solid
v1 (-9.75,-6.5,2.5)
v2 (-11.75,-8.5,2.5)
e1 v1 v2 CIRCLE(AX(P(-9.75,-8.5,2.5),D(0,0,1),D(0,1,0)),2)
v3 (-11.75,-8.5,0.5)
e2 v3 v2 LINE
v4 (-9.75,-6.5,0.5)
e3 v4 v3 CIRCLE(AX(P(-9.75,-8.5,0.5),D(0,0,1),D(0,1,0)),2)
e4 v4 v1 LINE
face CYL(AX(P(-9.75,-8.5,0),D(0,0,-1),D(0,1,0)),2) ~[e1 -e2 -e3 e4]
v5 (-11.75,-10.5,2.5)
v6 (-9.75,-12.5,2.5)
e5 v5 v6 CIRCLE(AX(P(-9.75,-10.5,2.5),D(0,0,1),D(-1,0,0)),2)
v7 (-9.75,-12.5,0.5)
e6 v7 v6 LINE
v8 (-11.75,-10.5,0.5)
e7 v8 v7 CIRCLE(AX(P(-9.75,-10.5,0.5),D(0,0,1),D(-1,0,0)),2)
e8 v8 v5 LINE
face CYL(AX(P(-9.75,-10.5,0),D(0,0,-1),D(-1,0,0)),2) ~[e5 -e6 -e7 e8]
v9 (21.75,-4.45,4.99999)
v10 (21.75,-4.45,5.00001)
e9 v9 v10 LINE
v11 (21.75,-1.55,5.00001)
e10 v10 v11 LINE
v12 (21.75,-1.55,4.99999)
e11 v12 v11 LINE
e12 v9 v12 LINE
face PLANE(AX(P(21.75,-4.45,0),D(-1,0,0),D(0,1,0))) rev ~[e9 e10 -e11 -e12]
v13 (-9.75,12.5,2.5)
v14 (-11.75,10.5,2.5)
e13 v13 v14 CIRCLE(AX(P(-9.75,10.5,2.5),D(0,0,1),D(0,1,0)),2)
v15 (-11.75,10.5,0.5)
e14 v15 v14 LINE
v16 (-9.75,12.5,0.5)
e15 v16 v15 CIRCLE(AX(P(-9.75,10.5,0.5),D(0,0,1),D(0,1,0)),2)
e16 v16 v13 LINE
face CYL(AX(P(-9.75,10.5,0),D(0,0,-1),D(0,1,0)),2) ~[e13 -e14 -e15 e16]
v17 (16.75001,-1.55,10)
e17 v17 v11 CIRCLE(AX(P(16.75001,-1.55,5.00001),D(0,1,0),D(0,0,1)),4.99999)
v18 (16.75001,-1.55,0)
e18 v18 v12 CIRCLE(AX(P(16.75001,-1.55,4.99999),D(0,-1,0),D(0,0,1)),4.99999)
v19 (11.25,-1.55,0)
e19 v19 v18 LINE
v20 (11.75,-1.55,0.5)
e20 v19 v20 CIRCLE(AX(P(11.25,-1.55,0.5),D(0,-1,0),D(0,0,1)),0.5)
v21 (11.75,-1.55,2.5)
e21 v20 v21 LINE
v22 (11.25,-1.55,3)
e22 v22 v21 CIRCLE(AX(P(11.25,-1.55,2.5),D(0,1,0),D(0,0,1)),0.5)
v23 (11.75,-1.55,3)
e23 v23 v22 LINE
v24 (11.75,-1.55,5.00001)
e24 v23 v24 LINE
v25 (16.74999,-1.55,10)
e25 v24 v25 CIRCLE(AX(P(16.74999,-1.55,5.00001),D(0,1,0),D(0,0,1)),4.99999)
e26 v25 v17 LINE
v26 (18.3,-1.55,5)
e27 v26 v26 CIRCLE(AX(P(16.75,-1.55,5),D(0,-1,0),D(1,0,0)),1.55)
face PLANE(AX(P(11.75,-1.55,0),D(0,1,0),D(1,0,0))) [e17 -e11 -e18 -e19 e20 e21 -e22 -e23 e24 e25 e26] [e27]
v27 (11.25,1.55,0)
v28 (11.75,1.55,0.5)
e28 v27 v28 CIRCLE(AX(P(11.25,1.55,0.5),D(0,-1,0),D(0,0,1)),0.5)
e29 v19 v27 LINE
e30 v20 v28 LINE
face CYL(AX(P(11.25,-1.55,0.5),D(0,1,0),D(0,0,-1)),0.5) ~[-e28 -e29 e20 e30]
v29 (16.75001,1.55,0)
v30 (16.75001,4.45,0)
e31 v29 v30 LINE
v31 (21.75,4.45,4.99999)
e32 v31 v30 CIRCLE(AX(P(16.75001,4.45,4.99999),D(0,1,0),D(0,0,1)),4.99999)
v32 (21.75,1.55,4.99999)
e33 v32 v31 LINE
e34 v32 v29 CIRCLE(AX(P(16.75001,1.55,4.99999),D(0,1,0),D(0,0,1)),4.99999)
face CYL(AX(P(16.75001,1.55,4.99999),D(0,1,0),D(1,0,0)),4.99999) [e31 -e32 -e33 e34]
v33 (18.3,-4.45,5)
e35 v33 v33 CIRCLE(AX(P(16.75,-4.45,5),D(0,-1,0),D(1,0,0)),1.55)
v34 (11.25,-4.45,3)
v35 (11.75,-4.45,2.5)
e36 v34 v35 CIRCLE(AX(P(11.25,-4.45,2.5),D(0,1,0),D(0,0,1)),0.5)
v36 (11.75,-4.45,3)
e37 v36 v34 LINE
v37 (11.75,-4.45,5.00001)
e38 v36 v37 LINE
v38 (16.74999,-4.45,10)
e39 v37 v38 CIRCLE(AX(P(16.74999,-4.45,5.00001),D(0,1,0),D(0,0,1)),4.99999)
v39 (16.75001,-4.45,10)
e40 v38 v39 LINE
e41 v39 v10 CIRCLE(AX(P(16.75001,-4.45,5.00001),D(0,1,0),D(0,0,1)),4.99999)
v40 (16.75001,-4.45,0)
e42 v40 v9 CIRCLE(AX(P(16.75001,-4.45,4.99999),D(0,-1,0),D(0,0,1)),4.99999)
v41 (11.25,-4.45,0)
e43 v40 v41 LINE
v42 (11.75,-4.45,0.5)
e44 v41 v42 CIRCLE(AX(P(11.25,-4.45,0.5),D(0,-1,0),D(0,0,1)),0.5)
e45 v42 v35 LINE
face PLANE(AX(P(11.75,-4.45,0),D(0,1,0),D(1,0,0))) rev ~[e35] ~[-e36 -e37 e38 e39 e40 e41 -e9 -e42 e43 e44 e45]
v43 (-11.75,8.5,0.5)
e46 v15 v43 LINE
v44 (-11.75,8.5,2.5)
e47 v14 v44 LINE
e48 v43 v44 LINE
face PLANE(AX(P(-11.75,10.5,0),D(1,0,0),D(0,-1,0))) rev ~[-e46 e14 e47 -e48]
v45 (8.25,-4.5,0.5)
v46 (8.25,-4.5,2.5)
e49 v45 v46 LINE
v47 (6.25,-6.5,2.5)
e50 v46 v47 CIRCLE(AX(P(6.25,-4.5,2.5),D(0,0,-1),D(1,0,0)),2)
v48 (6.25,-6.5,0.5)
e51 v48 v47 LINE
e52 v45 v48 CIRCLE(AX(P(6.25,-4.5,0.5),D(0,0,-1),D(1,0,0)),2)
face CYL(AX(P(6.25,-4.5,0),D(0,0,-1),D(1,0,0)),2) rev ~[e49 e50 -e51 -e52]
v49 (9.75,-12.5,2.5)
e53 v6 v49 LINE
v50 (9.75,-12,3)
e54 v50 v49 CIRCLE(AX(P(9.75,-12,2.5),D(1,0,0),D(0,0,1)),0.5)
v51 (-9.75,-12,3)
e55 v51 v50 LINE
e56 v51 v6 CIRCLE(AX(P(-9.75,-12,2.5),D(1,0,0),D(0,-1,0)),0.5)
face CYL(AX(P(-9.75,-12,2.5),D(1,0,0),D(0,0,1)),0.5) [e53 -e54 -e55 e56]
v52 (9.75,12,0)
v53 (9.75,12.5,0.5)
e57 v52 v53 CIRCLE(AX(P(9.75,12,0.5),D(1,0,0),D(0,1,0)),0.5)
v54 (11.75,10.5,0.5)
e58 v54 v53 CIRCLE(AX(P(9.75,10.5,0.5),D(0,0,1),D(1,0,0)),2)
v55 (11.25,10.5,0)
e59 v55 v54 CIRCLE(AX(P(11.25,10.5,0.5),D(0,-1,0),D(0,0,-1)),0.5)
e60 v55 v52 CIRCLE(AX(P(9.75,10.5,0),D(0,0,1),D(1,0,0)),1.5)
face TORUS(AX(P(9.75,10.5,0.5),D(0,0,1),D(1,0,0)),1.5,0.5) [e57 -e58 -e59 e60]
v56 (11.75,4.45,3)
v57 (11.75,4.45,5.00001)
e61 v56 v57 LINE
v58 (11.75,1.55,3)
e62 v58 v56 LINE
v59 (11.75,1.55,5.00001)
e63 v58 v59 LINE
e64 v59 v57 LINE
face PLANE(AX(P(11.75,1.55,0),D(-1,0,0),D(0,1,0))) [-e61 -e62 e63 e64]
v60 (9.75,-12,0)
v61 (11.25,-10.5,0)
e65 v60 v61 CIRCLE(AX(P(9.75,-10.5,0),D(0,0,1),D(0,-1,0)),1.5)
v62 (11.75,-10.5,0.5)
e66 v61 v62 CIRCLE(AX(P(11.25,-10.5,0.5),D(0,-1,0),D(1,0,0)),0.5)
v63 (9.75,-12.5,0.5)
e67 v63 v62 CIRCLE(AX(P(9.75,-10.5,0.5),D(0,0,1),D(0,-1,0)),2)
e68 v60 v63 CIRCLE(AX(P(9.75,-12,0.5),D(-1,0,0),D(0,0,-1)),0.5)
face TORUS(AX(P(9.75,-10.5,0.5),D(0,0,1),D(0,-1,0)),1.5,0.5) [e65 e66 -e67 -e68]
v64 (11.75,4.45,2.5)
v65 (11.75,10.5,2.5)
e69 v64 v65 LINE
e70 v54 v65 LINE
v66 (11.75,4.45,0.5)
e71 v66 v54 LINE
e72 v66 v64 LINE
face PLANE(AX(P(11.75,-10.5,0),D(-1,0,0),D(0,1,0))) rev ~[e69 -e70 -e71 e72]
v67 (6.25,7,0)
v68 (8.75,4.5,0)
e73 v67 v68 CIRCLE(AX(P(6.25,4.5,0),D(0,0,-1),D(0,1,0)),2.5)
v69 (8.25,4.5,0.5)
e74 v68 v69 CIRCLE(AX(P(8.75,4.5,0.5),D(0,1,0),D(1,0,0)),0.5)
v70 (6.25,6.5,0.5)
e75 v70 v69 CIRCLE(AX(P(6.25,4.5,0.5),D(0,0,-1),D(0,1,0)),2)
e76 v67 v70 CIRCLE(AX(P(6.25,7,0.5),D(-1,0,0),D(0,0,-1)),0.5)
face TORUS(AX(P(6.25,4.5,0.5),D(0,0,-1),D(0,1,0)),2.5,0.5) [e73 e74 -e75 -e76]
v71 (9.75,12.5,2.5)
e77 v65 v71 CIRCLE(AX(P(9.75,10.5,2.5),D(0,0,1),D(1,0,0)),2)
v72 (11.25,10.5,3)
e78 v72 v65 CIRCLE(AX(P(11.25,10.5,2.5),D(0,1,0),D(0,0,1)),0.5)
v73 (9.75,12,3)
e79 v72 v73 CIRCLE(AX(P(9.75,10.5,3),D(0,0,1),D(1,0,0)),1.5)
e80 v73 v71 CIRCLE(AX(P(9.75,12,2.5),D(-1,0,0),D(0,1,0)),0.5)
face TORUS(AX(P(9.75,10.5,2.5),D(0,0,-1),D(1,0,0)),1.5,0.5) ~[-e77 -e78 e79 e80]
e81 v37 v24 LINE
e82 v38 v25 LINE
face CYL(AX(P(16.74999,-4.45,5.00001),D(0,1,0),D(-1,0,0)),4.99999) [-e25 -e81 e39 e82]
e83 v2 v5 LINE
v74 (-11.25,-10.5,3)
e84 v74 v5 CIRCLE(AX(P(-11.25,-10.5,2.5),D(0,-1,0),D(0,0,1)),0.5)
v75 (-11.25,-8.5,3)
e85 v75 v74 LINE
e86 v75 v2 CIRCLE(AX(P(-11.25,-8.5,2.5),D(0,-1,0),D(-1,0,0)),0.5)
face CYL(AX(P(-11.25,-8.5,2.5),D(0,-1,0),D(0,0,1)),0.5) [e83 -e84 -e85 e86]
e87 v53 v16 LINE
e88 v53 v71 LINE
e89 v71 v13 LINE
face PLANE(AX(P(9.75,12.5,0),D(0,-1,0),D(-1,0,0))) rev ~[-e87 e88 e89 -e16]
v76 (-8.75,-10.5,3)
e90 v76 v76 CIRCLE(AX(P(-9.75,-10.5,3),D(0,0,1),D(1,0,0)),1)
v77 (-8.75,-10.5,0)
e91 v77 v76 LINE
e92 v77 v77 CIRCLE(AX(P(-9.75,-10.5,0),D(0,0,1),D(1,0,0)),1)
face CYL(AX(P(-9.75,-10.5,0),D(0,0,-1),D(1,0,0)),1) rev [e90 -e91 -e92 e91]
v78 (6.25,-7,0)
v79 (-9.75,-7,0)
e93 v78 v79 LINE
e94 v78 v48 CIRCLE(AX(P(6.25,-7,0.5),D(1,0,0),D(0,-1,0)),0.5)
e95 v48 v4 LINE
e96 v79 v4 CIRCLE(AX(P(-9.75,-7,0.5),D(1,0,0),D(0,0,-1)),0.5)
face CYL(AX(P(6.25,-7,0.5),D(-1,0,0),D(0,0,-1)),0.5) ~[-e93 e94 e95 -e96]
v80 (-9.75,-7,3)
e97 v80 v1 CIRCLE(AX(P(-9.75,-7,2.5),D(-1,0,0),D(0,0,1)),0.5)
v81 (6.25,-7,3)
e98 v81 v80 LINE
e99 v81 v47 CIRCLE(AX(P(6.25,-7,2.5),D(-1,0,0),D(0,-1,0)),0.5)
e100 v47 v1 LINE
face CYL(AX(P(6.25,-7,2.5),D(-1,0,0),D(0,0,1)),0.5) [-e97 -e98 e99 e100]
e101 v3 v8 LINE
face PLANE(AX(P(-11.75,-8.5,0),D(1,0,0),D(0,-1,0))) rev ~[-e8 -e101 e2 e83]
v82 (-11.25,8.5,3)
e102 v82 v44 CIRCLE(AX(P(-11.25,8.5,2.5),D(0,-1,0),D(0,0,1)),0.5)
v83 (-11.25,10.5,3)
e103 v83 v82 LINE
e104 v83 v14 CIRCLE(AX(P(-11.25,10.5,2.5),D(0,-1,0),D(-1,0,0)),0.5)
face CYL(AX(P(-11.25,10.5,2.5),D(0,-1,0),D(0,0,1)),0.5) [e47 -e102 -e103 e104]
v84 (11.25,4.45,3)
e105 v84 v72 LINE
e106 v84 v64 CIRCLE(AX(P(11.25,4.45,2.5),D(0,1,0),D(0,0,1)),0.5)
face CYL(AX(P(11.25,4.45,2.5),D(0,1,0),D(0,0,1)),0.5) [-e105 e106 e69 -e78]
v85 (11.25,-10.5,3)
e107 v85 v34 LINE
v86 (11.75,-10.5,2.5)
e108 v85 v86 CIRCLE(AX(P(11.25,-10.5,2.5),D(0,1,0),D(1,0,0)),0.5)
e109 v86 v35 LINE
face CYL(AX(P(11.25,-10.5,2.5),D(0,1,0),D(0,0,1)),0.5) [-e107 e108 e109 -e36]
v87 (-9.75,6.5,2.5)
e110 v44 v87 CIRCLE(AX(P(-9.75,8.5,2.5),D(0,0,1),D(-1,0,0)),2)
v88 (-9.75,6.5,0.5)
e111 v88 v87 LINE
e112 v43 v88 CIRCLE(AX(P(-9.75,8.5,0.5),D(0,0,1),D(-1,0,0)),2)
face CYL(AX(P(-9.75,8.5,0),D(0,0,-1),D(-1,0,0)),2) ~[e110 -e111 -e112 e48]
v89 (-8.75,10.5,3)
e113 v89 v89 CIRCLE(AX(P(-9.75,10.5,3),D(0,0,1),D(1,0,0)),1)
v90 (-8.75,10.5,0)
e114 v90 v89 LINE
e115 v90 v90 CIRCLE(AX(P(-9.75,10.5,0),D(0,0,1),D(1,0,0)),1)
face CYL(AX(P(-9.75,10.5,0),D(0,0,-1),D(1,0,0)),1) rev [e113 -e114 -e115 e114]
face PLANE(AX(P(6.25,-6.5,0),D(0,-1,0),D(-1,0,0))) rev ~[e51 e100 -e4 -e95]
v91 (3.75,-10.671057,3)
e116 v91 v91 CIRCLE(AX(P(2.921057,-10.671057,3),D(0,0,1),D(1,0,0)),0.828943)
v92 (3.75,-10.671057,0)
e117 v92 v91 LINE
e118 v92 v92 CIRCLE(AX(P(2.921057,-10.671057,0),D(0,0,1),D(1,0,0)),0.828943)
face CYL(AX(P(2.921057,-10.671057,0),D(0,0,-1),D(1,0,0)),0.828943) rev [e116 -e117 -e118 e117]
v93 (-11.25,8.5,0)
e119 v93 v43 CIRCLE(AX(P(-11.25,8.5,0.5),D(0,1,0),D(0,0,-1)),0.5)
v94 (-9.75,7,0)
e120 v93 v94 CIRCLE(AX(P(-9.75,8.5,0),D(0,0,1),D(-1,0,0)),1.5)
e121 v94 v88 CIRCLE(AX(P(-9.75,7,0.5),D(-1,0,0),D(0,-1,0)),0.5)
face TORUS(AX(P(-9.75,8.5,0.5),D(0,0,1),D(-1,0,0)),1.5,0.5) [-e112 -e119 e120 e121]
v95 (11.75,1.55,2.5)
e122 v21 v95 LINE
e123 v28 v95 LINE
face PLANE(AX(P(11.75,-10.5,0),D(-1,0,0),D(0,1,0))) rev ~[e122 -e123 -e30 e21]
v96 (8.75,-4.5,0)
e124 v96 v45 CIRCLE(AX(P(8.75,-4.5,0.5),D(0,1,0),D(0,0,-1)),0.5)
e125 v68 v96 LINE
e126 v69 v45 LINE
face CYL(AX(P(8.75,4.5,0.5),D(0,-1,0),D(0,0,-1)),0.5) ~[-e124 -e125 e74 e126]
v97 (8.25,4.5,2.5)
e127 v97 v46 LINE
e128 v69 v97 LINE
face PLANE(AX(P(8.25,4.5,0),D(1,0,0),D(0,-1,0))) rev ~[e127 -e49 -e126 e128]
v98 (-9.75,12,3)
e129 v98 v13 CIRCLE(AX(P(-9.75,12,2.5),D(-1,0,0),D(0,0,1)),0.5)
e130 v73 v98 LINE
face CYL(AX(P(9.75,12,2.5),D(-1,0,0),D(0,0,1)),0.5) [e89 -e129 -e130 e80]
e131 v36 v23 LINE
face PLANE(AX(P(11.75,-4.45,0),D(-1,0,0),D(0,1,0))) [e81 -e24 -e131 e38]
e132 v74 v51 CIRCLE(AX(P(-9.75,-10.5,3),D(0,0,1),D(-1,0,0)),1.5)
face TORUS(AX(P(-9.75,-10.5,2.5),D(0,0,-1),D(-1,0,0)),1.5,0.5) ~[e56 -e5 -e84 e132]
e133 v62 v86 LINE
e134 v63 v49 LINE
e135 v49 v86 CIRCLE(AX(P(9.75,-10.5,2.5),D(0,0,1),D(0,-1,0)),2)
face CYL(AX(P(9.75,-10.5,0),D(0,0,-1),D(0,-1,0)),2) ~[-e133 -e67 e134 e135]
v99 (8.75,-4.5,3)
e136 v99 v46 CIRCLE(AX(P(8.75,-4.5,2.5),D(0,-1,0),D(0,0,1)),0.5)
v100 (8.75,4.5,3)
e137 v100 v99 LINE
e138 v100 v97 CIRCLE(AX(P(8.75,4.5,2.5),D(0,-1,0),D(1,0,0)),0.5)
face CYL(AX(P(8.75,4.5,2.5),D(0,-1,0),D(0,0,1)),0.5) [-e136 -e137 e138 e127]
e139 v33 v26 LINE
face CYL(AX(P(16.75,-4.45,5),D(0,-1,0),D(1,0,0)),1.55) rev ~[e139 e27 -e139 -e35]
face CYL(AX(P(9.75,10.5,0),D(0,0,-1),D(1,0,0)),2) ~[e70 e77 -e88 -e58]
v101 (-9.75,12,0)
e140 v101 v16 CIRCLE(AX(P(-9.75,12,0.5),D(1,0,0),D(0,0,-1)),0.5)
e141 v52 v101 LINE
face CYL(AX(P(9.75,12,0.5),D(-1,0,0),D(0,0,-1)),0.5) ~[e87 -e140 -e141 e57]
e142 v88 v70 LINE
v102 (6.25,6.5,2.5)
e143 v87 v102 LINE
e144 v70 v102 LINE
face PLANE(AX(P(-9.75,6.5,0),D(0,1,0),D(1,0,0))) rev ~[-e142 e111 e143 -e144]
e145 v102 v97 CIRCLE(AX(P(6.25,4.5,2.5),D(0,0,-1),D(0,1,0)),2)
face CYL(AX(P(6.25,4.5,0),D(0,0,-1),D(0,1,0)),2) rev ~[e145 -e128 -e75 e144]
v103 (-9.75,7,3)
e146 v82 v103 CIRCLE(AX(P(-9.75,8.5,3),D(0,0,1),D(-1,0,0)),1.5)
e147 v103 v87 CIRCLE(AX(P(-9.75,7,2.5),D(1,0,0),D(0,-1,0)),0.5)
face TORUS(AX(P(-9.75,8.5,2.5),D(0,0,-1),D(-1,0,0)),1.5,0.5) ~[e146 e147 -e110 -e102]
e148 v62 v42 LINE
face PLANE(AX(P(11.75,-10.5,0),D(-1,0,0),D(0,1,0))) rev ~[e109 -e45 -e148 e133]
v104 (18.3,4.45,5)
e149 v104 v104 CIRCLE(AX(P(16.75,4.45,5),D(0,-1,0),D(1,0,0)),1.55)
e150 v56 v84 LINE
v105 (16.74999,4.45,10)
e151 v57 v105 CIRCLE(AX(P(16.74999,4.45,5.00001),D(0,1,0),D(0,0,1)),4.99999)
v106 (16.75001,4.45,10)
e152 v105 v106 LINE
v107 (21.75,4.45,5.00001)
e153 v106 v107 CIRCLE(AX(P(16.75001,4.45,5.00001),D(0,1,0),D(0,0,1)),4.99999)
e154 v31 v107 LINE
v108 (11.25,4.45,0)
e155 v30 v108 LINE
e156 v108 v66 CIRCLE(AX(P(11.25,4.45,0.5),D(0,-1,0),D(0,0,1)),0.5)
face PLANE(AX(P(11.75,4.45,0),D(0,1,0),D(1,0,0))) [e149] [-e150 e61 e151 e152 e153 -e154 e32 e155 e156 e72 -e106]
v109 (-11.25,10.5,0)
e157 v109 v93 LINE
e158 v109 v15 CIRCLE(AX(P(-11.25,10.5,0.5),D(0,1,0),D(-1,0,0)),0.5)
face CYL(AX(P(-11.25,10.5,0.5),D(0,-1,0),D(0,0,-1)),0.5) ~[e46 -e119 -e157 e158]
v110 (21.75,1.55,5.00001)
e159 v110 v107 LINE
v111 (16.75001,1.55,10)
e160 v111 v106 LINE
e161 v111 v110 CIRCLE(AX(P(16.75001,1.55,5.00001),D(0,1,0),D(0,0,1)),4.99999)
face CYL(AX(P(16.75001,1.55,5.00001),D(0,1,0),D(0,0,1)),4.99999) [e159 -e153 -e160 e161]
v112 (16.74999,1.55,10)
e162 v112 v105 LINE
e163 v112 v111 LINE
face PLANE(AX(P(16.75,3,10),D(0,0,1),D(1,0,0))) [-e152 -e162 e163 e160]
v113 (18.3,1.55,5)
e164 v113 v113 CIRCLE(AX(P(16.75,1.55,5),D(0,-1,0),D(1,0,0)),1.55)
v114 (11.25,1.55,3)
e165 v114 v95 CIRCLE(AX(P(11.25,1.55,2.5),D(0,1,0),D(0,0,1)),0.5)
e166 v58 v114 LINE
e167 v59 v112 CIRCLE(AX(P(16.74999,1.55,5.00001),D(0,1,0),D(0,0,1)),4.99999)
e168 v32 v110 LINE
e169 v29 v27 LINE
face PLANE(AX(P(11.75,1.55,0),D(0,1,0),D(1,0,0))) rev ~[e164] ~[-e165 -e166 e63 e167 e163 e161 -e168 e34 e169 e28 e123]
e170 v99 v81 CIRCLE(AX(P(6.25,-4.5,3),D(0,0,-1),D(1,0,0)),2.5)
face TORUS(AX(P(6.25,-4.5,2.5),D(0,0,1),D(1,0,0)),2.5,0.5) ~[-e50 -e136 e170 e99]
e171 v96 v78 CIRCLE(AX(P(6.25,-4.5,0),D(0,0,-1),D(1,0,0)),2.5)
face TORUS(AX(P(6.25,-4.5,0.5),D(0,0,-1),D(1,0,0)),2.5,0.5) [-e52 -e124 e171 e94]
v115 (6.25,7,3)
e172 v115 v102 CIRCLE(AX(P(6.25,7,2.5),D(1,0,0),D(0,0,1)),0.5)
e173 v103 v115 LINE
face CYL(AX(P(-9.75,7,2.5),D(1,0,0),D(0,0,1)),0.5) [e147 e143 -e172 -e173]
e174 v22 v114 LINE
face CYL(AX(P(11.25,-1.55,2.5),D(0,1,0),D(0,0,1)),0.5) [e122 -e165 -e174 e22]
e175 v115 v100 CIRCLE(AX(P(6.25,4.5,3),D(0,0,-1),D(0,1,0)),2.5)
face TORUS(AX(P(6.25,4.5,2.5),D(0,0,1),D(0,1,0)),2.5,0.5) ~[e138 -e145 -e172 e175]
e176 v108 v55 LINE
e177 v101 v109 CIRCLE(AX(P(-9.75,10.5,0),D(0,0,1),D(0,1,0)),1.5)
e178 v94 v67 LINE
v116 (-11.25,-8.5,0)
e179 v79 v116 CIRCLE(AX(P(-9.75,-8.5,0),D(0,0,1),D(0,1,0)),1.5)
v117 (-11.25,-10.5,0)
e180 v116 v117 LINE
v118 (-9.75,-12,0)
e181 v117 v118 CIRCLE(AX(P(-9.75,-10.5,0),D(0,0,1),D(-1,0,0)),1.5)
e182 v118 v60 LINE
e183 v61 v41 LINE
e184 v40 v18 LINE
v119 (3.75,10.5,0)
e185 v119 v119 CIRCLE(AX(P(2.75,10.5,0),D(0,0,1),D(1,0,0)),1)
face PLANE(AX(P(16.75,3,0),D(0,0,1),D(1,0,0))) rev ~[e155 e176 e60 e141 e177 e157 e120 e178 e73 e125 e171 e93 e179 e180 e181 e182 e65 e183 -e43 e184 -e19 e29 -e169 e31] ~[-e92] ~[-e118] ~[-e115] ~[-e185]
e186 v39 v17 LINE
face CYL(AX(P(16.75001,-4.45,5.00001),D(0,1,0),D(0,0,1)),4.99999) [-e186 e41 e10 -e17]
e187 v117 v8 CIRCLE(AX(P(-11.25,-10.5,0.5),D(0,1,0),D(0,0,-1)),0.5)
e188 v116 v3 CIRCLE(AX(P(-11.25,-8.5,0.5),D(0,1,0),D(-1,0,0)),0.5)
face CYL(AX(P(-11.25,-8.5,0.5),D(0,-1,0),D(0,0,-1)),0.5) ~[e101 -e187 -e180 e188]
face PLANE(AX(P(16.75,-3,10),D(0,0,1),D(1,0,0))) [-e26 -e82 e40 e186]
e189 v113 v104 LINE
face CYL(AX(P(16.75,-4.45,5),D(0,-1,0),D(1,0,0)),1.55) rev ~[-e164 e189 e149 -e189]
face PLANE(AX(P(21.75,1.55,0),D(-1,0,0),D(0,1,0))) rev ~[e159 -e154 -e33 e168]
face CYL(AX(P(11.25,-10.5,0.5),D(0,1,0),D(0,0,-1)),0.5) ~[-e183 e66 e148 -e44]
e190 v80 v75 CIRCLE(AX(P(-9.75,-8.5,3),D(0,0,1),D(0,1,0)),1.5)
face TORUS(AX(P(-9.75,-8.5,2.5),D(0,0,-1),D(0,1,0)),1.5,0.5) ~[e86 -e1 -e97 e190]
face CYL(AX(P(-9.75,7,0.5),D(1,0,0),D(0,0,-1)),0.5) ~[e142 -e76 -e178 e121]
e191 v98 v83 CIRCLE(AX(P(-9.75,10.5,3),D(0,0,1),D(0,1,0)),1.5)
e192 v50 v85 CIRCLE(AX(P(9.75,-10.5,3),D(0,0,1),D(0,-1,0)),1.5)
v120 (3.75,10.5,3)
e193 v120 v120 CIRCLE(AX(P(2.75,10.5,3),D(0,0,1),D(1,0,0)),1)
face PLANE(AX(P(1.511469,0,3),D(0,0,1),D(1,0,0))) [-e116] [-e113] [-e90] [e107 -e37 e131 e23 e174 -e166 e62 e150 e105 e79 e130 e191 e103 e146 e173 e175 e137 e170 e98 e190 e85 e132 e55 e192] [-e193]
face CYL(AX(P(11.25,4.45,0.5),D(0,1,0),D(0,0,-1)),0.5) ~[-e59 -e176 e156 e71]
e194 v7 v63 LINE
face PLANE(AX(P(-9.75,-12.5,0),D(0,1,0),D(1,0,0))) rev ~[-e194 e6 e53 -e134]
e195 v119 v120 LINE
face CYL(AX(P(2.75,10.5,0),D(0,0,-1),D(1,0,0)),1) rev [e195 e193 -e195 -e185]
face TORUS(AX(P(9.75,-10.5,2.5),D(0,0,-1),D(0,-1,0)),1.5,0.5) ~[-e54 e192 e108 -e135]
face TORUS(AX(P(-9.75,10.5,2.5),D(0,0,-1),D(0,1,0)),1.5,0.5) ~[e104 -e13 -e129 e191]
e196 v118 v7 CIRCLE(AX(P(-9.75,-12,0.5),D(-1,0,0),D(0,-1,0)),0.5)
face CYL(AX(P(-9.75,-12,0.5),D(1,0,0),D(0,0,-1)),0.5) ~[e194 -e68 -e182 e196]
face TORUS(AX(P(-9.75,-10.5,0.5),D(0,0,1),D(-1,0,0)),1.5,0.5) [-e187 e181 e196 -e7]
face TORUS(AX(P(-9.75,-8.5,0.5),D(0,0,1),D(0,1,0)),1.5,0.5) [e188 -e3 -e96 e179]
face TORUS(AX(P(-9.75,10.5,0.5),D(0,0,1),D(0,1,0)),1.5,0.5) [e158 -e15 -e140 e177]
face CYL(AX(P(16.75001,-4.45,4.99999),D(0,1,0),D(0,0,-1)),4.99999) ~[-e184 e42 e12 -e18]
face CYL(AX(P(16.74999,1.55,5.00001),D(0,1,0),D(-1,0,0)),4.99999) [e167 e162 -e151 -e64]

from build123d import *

# Parameters (mm, degrees)
F0_R     = 1
F0_R_2   = 0.8289430236
F1_DEPTH = 3
F0_W     = 10
F0_H     = 2.9
F2_DEPTH = 10
F3_R     = 4.99999
F5_R     = 0.5
F4_R     = 1.55
F6_DEPTH = 8.9


# Not quite as in the source:
# - a fillet or chamfer is up to 0.001 mm smaller than in the source, because OpenCascade refuses the exact size


with BuildPart() as f1:
    # F0 (on Top) → F1 (new body)
    with BuildSketch(Plane.XY):
        with BuildLine():
            ThreePointArc((11.75, 10.5), (11.1642135624, 11.9142135624), (9.75, 12.5))
            Line((9.75, 12.5), (-9.75, 12.5))
            ThreePointArc((-9.75, 12.5), (-11.1642135624, 11.9142135624), (-11.75, 10.5))
            Line((-11.75, 10.5), (-11.75, 8.5))
            ThreePointArc((-11.75, 8.5), (-11.1642135624, 7.0857864376), (-9.75, 6.5))
            Line((-9.75, 6.5), (6.25, 6.5))
            ThreePointArc((6.25, 6.5), (7.6642135624, 5.9142135624), (8.25, 4.5))
            Line((8.25, 4.5), (8.25, -4.5))
            ThreePointArc((8.25, -4.5), (7.6642135624, -5.9142135624), (6.25, -6.5))
            Line((6.25, -6.5), (-9.75, -6.5))
            ThreePointArc((-9.75, -6.5), (-11.1642135624, -7.0857864376), (-11.75, -8.5))
            Line((-11.75, -8.5), (-11.75, -10.5))
            ThreePointArc((-11.75, -10.5), (-11.1642135624, -11.9142135624), (-9.75, -12.5))
            Line((-9.75, -12.5), (9.75, -12.5))
            ThreePointArc((9.75, -12.5), (11.1642135624, -11.9142135624), (11.75, -10.5))
            Line((11.75, -10.5), (11.75, -4.45))
            Line((11.75, -4.45), (11.75, -1.55))
            Line((11.75, -1.55), (11.75, 1.55))
            Line((11.75, 1.55), (11.75, 4.45))
            Line((11.75, 4.45), (11.75, 10.5))
        make_face()
        with Locations((-9.75, -10.5)):
            Circle(F0_R, mode=Mode.SUBTRACT)
        with Locations((2.9210569764, -10.6710569764)):
            Circle(F0_R_2, mode=Mode.SUBTRACT)
        with Locations((-9.75, 10.5)):
            Circle(F0_R, mode=Mode.SUBTRACT)
        with Locations((2.75, 10.5)):
            Circle(F0_R, mode=Mode.SUBTRACT)
    extrude(amount=F1_DEPTH)

    # F0 (on Top) → F2 (join)
    with BuildSketch(Plane.XY):
        with Locations((16.75, 3)):
            Rectangle(F0_W, F0_H)
        with Locations((16.75, -3)):
            Rectangle(F0_W, F0_H)
    extrude(amount=F2_DEPTH)

    # F3 (radius 5 in the source; OpenCascade refuses exactly that, so slightly less here)
    f3_edges = [f1.edges().sort_by_distance(p)[0] for p in [
        (11.75, -3, 10),
        (11.75, 3, 10),
        (21.75, 3, 10),
        (21.75, -3, 10),
        (21.75, 3, 0),
        (21.75, -3, 0),
    ]]
    fillet(f3_edges, radius=F3_R)

    # F5
    f5_edges = [f1.edges().sort_by_distance(p)[0] for p in [
        (-1.75, 6.5, 3),
        (11.75, 7.475, 3),
        (11.75, 0, 3),
        (11.75, -7.475, 3),
        (0, -12.5, 0),
        (11.75, 0, 0),
    ]]
    fillet(f5_edges, radius=F5_R)

    # F4 (on face) → F6 (cut)
    with BuildSketch(Plane.XZ.offset(4.45)):
        with Locations((16.75, 5)):
            Circle(F4_R)
    extrude(amount=-F6_DEPTH, mode=Mode.SUBTRACT)


solid = f1.part
